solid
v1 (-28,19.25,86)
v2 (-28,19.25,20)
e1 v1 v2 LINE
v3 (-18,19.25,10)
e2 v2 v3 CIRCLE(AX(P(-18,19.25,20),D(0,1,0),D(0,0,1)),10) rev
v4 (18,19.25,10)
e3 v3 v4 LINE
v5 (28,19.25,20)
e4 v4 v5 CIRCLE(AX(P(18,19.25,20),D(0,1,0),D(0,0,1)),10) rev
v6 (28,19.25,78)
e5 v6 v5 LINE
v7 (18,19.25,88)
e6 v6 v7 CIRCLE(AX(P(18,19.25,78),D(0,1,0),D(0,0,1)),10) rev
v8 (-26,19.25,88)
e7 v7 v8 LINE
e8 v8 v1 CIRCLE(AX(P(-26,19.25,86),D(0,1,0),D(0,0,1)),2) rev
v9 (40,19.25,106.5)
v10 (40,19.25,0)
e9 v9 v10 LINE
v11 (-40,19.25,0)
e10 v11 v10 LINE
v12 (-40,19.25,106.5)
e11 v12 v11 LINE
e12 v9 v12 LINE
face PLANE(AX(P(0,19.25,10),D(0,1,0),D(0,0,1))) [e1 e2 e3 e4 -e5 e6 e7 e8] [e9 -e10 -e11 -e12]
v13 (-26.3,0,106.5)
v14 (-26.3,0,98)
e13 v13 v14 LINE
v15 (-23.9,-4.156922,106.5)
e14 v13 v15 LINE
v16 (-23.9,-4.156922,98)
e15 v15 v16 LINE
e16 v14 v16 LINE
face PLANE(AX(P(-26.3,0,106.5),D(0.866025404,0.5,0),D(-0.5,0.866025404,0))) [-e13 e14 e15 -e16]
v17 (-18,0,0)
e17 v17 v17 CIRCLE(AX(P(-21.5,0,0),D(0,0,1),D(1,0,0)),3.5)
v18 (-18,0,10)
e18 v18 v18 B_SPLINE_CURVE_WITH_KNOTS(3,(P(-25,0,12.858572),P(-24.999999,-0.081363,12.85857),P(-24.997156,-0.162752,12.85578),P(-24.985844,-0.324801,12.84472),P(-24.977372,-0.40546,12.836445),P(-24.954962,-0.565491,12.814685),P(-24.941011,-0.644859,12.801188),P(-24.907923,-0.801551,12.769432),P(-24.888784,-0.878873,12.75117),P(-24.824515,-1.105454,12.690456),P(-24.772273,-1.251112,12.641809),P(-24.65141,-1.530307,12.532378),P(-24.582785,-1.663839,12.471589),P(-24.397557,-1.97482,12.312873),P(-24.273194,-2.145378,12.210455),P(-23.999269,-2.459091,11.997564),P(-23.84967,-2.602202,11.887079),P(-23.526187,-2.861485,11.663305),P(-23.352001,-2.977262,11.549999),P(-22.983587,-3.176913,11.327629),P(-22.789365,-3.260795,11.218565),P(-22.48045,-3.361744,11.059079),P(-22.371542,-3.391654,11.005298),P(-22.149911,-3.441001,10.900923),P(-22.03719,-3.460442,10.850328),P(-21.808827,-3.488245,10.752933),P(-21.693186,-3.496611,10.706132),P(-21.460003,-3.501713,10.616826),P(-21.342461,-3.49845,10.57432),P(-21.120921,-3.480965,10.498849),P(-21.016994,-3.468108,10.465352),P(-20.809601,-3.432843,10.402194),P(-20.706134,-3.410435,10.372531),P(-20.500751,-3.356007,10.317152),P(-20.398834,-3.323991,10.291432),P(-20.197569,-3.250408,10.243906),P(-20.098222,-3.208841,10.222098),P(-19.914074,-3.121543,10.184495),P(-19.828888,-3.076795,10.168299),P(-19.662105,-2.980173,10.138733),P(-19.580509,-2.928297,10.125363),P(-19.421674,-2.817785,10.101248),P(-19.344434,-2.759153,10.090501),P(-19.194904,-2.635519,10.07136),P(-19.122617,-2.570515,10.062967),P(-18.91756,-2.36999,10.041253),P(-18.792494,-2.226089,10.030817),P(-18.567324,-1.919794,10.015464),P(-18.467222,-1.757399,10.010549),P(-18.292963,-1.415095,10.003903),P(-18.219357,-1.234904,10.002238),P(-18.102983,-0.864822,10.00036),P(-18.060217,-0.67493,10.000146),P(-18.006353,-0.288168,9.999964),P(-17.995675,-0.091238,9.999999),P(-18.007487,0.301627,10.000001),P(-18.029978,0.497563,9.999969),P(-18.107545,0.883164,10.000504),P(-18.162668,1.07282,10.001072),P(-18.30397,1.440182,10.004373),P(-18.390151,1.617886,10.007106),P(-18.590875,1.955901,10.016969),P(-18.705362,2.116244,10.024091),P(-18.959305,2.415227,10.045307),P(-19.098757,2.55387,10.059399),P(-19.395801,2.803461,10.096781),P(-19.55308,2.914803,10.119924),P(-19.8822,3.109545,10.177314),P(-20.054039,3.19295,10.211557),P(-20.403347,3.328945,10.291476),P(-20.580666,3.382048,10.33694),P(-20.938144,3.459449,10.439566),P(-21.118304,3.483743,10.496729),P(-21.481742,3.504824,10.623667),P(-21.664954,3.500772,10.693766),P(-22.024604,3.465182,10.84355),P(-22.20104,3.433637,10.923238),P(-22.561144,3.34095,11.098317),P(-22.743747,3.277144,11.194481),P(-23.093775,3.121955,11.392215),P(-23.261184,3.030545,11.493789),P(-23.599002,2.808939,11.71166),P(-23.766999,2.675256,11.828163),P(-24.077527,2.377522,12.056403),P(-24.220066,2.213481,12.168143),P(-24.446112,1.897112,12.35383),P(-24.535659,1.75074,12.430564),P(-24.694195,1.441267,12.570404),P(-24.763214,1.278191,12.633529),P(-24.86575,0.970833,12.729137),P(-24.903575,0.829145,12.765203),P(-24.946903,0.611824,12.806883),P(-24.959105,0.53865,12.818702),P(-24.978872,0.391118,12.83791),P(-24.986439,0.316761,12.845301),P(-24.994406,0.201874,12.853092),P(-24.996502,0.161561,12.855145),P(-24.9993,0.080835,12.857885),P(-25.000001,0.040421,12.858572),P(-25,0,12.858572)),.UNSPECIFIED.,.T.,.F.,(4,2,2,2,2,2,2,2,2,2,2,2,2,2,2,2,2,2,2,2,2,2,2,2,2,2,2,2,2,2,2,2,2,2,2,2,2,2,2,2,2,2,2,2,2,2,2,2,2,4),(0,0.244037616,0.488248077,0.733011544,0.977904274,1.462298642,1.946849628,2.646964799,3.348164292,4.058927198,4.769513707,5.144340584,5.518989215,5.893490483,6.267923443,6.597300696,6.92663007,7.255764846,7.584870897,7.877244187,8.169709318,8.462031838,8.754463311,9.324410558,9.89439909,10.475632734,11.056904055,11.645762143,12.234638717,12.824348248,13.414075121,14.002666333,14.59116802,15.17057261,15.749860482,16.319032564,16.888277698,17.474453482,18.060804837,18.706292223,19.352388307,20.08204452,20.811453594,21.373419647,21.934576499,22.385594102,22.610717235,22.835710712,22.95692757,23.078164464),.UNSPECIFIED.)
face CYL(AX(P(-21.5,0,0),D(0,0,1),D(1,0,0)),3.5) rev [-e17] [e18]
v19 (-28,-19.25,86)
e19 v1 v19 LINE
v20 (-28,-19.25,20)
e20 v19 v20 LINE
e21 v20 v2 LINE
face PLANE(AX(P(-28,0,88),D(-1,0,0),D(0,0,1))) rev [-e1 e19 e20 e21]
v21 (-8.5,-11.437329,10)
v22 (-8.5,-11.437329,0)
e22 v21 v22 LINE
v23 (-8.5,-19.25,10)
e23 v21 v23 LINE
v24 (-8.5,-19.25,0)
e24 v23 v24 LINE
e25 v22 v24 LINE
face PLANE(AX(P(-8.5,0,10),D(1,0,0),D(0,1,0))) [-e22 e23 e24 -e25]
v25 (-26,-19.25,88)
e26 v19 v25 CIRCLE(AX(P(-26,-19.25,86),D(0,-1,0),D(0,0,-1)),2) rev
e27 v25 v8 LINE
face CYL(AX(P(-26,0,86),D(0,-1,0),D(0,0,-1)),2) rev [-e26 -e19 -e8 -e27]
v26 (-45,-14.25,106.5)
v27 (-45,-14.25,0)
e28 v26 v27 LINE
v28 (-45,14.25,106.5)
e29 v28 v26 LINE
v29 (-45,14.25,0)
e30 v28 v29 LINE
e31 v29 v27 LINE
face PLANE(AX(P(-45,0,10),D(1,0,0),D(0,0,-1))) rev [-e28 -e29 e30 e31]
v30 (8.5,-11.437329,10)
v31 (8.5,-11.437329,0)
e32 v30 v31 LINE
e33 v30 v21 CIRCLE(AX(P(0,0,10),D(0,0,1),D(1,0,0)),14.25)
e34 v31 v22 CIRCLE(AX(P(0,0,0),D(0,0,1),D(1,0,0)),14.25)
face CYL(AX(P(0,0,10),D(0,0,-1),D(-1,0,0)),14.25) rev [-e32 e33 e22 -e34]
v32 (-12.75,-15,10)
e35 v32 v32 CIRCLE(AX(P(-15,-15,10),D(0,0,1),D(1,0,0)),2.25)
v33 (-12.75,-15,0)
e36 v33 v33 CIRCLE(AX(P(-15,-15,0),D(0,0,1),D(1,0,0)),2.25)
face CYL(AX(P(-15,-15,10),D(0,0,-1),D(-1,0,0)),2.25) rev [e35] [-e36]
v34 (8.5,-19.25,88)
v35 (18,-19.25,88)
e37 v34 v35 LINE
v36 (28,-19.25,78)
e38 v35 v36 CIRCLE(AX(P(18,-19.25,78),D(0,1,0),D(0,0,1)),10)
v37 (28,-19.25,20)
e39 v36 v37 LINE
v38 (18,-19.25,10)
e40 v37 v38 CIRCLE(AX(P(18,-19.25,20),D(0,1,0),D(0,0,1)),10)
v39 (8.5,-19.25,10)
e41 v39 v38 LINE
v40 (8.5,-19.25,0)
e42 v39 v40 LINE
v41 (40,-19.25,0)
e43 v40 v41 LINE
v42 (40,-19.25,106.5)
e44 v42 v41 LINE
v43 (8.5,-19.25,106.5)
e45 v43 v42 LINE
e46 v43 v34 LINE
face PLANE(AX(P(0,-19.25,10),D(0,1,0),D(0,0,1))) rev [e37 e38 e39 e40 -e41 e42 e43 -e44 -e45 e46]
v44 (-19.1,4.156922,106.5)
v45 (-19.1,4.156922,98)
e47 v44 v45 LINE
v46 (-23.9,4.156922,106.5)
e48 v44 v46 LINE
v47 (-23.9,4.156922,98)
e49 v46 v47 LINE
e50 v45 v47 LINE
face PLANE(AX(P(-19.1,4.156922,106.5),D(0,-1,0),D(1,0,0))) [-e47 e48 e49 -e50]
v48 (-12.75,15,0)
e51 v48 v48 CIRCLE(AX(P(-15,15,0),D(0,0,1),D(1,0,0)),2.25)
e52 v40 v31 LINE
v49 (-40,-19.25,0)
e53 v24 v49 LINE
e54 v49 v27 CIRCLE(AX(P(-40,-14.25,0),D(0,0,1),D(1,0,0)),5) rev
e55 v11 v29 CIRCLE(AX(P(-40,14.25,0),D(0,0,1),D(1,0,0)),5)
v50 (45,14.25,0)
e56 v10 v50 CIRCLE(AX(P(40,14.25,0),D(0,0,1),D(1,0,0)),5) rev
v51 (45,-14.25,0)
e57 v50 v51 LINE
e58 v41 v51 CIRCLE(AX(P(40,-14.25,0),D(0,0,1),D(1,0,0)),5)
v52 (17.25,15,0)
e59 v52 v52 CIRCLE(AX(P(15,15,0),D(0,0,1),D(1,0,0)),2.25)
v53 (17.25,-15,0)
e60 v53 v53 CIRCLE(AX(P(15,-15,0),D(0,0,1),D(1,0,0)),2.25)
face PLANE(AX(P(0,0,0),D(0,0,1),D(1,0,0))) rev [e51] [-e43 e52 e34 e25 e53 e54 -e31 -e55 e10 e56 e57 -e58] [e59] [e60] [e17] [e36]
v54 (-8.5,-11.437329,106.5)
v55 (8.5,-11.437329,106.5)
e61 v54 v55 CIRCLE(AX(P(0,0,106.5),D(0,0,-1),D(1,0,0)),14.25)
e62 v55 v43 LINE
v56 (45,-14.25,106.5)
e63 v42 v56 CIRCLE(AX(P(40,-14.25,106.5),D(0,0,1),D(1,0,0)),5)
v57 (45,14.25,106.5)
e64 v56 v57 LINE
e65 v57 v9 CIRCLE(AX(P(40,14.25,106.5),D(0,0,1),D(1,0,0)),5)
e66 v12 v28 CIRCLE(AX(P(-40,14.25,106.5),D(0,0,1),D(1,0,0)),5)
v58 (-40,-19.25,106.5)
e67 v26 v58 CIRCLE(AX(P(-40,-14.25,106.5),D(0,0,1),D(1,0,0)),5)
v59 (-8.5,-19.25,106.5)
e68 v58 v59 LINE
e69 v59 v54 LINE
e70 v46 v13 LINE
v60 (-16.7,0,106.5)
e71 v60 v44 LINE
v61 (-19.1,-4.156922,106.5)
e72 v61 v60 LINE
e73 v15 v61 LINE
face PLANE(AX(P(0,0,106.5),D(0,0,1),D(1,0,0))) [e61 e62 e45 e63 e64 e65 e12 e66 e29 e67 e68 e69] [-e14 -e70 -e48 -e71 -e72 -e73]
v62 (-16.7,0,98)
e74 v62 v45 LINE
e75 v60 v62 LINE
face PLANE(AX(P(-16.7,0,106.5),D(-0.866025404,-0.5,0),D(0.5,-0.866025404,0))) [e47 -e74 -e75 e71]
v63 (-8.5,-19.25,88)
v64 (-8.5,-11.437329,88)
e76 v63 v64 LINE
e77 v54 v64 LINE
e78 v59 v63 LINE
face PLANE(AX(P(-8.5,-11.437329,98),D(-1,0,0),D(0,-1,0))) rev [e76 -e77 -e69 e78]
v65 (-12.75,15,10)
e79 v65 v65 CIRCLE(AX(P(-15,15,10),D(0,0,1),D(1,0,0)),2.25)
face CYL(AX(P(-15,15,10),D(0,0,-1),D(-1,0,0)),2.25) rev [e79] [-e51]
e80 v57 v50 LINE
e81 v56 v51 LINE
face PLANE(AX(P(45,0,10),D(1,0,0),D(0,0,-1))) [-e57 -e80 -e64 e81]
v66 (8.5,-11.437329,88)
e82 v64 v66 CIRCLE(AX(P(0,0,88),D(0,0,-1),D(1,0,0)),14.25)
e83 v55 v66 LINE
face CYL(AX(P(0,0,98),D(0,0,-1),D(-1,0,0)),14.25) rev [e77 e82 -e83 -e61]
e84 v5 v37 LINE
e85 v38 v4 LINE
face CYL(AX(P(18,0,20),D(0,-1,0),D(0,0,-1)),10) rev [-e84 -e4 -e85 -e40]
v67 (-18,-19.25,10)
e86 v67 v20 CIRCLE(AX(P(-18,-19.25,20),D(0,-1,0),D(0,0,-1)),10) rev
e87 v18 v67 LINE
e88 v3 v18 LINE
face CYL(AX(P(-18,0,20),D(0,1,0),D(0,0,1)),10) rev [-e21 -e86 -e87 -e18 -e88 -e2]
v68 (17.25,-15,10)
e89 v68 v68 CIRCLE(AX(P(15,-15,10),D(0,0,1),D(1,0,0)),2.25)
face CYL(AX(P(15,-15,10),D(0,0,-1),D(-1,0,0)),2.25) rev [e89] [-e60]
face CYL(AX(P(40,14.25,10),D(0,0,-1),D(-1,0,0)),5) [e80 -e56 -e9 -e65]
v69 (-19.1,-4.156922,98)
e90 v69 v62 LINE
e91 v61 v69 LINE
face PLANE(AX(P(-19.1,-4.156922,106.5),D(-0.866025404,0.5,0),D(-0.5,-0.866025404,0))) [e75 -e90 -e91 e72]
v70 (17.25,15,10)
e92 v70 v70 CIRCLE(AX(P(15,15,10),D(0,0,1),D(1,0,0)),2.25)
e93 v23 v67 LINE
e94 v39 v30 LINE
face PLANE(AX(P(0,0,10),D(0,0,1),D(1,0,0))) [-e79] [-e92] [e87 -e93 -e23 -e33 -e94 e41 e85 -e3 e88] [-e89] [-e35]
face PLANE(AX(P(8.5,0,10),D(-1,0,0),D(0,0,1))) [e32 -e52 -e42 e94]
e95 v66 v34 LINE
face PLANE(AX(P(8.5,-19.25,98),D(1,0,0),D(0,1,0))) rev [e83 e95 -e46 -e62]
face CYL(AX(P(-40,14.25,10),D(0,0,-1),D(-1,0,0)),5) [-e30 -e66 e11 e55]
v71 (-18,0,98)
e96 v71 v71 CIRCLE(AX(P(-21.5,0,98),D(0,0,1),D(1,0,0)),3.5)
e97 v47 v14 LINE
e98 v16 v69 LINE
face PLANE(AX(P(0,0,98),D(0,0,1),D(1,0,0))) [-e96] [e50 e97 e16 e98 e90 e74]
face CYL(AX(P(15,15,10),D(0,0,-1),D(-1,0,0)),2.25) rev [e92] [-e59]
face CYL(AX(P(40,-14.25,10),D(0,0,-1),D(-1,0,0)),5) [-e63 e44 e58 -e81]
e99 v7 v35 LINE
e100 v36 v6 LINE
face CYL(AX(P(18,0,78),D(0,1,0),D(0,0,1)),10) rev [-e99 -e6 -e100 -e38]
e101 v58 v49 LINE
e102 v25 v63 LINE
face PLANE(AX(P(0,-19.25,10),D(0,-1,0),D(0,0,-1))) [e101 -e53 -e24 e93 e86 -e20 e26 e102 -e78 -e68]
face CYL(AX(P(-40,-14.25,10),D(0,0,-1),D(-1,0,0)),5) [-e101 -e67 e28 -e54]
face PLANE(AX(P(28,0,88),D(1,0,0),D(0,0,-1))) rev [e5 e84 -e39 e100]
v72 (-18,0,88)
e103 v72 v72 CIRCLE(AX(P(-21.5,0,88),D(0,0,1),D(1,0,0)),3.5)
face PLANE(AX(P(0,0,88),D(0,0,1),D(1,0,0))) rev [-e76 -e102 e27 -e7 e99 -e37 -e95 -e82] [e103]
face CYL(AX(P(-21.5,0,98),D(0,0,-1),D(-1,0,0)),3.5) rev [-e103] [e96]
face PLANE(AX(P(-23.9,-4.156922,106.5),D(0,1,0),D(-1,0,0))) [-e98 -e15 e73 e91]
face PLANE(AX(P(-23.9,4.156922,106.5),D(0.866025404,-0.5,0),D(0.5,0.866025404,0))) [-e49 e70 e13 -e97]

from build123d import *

# Parameters (mm, degrees)
SKETCH1_R             = 2.25
BOSS_EXTRUDE1_DEPTH   = 10
BOSS_EXTRUDE3_DEPTH   = 78
BOSS_EXTRUDE3_2_DEPTH = 78
SKETCH4_R             = 3.5
BOSS_EXTRUDE4_DEPTH   = 10
BOSS_EXTRUDE5_DEPTH   = 8.5
SKETCH5_R             = 3.5
CUT_EXTRUDE1_DEPTH    = 110.542514578
FILLET2_R             = 2
FILLET3_R             = 10


with BuildPart() as part:
    # Sketch1 → Boss-Extrude1 (new body)
    with BuildSketch(Plane.XY):
        with BuildLine():
            Line((15, 19.25), (-15, 19.25))
            Line((-15, 19.25), (-30, 19.25))
            Line((-30, 19.25), (-40, 19.25))
            ThreePointArc((-40, 19.25), (-43.535533906, 17.785533906), (-45, 14.25))
            Line((-45, 14.25), (-45, -14.25))
            ThreePointArc((-45, -14.25), (-43.535533906, -17.785533906), (-40, -19.25))
            Line((-40, -19.25), (-30, -19.25))
            Line((-30, -19.25), (-15, -19.25))
            Line((-15, -19.25), (-8.5, -19.25))
            Line((-8.5, -19.25), (-8.5, -16.75))
            Line((-8.5, -16.75), (-8.5, -11.437329234))
            ThreePointArc((-8.5, -11.437329234), (0, 14.25), (8.5, -11.437329234))
            Line((8.5, -11.437329234), (8.5, -16.75))
            Line((8.5, -16.75), (8.5, -19.25))
            Line((8.5, -19.25), (15, -19.25))
            Line((15, -19.25), (30, -19.25))
            Line((30, -19.25), (40, -19.25))
            ThreePointArc((40, -19.25), (43.535533906, -17.785533906), (45, -14.25))
            Line((45, -14.25), (45, 14.25))
            ThreePointArc((45, 14.25), (43.535533906, 17.785533906), (40, 19.25))
            Line((40, 19.25), (30, 19.25))
            Line((30, 19.25), (15, 19.25))
        make_face()
        with Locations((-15, -15)):
            Circle(SKETCH1_R, mode=Mode.SUBTRACT)
        with Locations((15, -15)):
            Circle(SKETCH1_R, mode=Mode.SUBTRACT)
        with Locations((-15, 15)):
            Circle(SKETCH1_R, mode=Mode.SUBTRACT)
        with Locations((15, 15)):
            Circle(SKETCH1_R, mode=Mode.SUBTRACT)
    extrude(amount=BOSS_EXTRUDE1_DEPTH)

    # Sketch5 → Cut-Extrude1 (cut, through all)
    with BuildSketch(Plane.XY.offset(98)):
        with Locations((-21.5, 0)):
            Circle(SKETCH5_R)
    extrude(amount=-CUT_EXTRUDE1_DEPTH, mode=Mode.SUBTRACT)


with BuildPart() as body_2:
    # Sketch2 → Boss-Extrude3 (new body)
    with BuildSketch(Plane.XY.offset(10)):
        with BuildLine():
            Line((-45, 14.25), (-45, -14.25))
            ThreePointArc((-45, -14.25), (-43.535533906, -17.785533906), (-40, -19.25))
            Line((-40, -19.25), (-28, -19.25))
            Line((-28, -19.25), (-28, 0))
            Line((-28, 0), (-28, 19.25))
            Line((-28, 19.25), (-40, 19.25))
            ThreePointArc((-40, 19.25), (-43.535533906, 17.785533906), (-45, 14.25))
        make_face()
    extrude(amount=BOSS_EXTRUDE3_DEPTH)

    # Sketch4 → Boss-Extrude4 (add)
    with BuildSketch(Plane.XY.offset(88)):
        with BuildLine():
            Line((-45, 14.25), (-45, -14.25))
            ThreePointArc((-45, -14.25), (-43.535533906, -17.785533906), (-40, -19.25))
            Line((-40, -19.25), (-8.5, -19.25))
            Line((-8.5, -19.25), (-8.5, -11.437329234))
            ThreePointArc((-8.5, -11.437329234), (0, 14.25), (8.5, -11.437329234))
            Line((8.5, -11.437329234), (8.5, -19.25))
            Line((8.5, -19.25), (40, -19.25))
            ThreePointArc((40, -19.25), (43.535533906, -17.785533906), (45, -14.25))
            Line((45, -14.25), (45, 14.25))
            ThreePointArc((45, 14.25), (43.535533906, 17.785533906), (40, 19.25))
            Line((40, 19.25), (-40, 19.25))
            ThreePointArc((-40, 19.25), (-43.535533906, 17.785533906), (-45, 14.25))
        make_face()
        with Locations((-21.5, 0)):
            Circle(SKETCH4_R, mode=Mode.SUBTRACT)
    extrude(amount=BOSS_EXTRUDE4_DEPTH)

    # Sketch6 → Boss-Extrude5 (add)
    with BuildSketch(Plane.XY.offset(98)):
        with BuildLine():
            Line((-40, -19.25), (-8.5, -19.25))
            Line((-8.5, -19.25), (-8.5, -11.437329234))
            ThreePointArc((-8.5, -11.437329234), (0, 14.25), (8.5, -11.437329234))
            Line((8.5, -11.437329234), (8.5, -19.25))
            Line((8.5, -19.25), (40, -19.25))
            ThreePointArc((40, -19.25), (43.535533906, -17.785533906), (45, -14.25))
            Line((45, -14.25), (45, 14.25))
            ThreePointArc((45, 14.25), (43.535533906, 17.785533906), (40, 19.25))
            Line((40, 19.25), (-40, 19.25))
            ThreePointArc((-40, 19.25), (-43.535533906, 17.785533906), (-45, 14.25))
            Line((-45, 14.25), (-45, -14.25))
            ThreePointArc((-45, -14.25), (-43.535533906, -17.785533906), (-40, -19.25))
        make_face()
        Polygon((-16.7, 0), (-19.1, 4.156921938), (-23.9, 4.156921938), (-26.3, 0), (-23.9, -4.156921938), (-19.1, -4.156921938), align=None, mode=Mode.SUBTRACT)
    extrude(amount=BOSS_EXTRUDE5_DEPTH)


with BuildPart() as body_3:
    # Sketch2 → Boss-Extrude3 2 (new body)
    with BuildSketch(Plane.XY.offset(10)):
        with BuildLine():
            Line((40, -19.25), (28, -19.25))
            Line((28, -19.25), (28, 0))
            Line((28, 0), (28, 19.25))
            Line((28, 19.25), (40, 19.25))
            ThreePointArc((40, 19.25), (43.535533906, 17.785533906), (45, 14.25))
            Line((45, 14.25), (45, -14.25))
            ThreePointArc((45, -14.25), (43.535533906, -17.785533906), (40, -19.25))
        make_face()
    extrude(amount=BOSS_EXTRUDE3_2_DEPTH)


with BuildPart() as part_1:
    add(part.part)

    # Combine1: union body 2, body 3
    add(body_2.part)
    add(body_3.part)

    # Fillet2
    fillet2_edges = [part_1.edges().sort_by_distance(p)[0] for p in [
        (-28, 0, 88),
    ]]
    fillet(fillet2_edges, radius=FILLET2_R)

    # Fillet3
    # the kernel refuses this fillet: 10 mm, written as the material it adds along each edge
    with BuildSketch(Plane(origin=(28, -19.25, 88), x_dir=(-1, 0, 0), z_dir=(0, 1, 0))) as fillet3_piece_1:
        with BuildLine():
            CenterArc((FILLET3_R, -FILLET3_R), FILLET3_R, 90, 90)
            Line((0, -FILLET3_R), (-FILLET3_R * 0.02, -FILLET3_R))
            Line((-FILLET3_R * 0.02, -FILLET3_R), (-FILLET3_R * 0.02, FILLET3_R * 0.02))
            Line((-FILLET3_R * 0.02, FILLET3_R * 0.02), (FILLET3_R, FILLET3_R * 0.02))
            Line((FILLET3_R, FILLET3_R * 0.02), (FILLET3_R, 0))
        make_face()
    extrude(amount=38.5)
    with BuildSketch(Plane(origin=(-28, -19.25, 10), x_dir=(0, 0, 1), z_dir=(0, 1, 0))) as fillet3_piece_2_section:
        with BuildLine():
            CenterArc((FILLET3_R, FILLET3_R), FILLET3_R, 180, 90)
            Line((0, FILLET3_R), (-FILLET3_R * 0.02, FILLET3_R))
            Line((-FILLET3_R * 0.02, FILLET3_R), (-FILLET3_R * 0.02, -FILLET3_R * 0.02))
            Line((-FILLET3_R * 0.02, -FILLET3_R * 0.02), (FILLET3_R, -FILLET3_R * 0.02))
            Line((FILLET3_R, -FILLET3_R * 0.02), (FILLET3_R, 0))
        make_face()
    fillet3_piece_2 = extrude(amount=38.5, mode=Mode.PRIVATE)
    fillet3_piece_2 = fillet3_piece_2 - Plane(origin=(-21.5, 0, 12.335340949), x_dir=(1, 0, 0), z_dir=(0, 0, 1)) * Cylinder(3.5, 117, mode=Mode.PRIVATE)
    add(fillet3_piece_2)
    with BuildSketch(Plane(origin=(28, 19.25, 10), x_dir=(0, 0, 1), z_dir=(0, -1, 0))) as fillet3_piece_3:
        with BuildLine():
            CenterArc((FILLET3_R, FILLET3_R), FILLET3_R, 180, 90)
            Line((0, FILLET3_R), (-FILLET3_R * 0.02, FILLET3_R))
            Line((-FILLET3_R * 0.02, FILLET3_R), (-FILLET3_R * 0.02, -FILLET3_R * 0.02))
            Line((-FILLET3_R * 0.02, -FILLET3_R * 0.02), (FILLET3_R, -FILLET3_R * 0.02))
            Line((FILLET3_R, -FILLET3_R * 0.02), (FILLET3_R, 0))
        make_face()
    extrude(amount=38.5)


solid = part_1.part
